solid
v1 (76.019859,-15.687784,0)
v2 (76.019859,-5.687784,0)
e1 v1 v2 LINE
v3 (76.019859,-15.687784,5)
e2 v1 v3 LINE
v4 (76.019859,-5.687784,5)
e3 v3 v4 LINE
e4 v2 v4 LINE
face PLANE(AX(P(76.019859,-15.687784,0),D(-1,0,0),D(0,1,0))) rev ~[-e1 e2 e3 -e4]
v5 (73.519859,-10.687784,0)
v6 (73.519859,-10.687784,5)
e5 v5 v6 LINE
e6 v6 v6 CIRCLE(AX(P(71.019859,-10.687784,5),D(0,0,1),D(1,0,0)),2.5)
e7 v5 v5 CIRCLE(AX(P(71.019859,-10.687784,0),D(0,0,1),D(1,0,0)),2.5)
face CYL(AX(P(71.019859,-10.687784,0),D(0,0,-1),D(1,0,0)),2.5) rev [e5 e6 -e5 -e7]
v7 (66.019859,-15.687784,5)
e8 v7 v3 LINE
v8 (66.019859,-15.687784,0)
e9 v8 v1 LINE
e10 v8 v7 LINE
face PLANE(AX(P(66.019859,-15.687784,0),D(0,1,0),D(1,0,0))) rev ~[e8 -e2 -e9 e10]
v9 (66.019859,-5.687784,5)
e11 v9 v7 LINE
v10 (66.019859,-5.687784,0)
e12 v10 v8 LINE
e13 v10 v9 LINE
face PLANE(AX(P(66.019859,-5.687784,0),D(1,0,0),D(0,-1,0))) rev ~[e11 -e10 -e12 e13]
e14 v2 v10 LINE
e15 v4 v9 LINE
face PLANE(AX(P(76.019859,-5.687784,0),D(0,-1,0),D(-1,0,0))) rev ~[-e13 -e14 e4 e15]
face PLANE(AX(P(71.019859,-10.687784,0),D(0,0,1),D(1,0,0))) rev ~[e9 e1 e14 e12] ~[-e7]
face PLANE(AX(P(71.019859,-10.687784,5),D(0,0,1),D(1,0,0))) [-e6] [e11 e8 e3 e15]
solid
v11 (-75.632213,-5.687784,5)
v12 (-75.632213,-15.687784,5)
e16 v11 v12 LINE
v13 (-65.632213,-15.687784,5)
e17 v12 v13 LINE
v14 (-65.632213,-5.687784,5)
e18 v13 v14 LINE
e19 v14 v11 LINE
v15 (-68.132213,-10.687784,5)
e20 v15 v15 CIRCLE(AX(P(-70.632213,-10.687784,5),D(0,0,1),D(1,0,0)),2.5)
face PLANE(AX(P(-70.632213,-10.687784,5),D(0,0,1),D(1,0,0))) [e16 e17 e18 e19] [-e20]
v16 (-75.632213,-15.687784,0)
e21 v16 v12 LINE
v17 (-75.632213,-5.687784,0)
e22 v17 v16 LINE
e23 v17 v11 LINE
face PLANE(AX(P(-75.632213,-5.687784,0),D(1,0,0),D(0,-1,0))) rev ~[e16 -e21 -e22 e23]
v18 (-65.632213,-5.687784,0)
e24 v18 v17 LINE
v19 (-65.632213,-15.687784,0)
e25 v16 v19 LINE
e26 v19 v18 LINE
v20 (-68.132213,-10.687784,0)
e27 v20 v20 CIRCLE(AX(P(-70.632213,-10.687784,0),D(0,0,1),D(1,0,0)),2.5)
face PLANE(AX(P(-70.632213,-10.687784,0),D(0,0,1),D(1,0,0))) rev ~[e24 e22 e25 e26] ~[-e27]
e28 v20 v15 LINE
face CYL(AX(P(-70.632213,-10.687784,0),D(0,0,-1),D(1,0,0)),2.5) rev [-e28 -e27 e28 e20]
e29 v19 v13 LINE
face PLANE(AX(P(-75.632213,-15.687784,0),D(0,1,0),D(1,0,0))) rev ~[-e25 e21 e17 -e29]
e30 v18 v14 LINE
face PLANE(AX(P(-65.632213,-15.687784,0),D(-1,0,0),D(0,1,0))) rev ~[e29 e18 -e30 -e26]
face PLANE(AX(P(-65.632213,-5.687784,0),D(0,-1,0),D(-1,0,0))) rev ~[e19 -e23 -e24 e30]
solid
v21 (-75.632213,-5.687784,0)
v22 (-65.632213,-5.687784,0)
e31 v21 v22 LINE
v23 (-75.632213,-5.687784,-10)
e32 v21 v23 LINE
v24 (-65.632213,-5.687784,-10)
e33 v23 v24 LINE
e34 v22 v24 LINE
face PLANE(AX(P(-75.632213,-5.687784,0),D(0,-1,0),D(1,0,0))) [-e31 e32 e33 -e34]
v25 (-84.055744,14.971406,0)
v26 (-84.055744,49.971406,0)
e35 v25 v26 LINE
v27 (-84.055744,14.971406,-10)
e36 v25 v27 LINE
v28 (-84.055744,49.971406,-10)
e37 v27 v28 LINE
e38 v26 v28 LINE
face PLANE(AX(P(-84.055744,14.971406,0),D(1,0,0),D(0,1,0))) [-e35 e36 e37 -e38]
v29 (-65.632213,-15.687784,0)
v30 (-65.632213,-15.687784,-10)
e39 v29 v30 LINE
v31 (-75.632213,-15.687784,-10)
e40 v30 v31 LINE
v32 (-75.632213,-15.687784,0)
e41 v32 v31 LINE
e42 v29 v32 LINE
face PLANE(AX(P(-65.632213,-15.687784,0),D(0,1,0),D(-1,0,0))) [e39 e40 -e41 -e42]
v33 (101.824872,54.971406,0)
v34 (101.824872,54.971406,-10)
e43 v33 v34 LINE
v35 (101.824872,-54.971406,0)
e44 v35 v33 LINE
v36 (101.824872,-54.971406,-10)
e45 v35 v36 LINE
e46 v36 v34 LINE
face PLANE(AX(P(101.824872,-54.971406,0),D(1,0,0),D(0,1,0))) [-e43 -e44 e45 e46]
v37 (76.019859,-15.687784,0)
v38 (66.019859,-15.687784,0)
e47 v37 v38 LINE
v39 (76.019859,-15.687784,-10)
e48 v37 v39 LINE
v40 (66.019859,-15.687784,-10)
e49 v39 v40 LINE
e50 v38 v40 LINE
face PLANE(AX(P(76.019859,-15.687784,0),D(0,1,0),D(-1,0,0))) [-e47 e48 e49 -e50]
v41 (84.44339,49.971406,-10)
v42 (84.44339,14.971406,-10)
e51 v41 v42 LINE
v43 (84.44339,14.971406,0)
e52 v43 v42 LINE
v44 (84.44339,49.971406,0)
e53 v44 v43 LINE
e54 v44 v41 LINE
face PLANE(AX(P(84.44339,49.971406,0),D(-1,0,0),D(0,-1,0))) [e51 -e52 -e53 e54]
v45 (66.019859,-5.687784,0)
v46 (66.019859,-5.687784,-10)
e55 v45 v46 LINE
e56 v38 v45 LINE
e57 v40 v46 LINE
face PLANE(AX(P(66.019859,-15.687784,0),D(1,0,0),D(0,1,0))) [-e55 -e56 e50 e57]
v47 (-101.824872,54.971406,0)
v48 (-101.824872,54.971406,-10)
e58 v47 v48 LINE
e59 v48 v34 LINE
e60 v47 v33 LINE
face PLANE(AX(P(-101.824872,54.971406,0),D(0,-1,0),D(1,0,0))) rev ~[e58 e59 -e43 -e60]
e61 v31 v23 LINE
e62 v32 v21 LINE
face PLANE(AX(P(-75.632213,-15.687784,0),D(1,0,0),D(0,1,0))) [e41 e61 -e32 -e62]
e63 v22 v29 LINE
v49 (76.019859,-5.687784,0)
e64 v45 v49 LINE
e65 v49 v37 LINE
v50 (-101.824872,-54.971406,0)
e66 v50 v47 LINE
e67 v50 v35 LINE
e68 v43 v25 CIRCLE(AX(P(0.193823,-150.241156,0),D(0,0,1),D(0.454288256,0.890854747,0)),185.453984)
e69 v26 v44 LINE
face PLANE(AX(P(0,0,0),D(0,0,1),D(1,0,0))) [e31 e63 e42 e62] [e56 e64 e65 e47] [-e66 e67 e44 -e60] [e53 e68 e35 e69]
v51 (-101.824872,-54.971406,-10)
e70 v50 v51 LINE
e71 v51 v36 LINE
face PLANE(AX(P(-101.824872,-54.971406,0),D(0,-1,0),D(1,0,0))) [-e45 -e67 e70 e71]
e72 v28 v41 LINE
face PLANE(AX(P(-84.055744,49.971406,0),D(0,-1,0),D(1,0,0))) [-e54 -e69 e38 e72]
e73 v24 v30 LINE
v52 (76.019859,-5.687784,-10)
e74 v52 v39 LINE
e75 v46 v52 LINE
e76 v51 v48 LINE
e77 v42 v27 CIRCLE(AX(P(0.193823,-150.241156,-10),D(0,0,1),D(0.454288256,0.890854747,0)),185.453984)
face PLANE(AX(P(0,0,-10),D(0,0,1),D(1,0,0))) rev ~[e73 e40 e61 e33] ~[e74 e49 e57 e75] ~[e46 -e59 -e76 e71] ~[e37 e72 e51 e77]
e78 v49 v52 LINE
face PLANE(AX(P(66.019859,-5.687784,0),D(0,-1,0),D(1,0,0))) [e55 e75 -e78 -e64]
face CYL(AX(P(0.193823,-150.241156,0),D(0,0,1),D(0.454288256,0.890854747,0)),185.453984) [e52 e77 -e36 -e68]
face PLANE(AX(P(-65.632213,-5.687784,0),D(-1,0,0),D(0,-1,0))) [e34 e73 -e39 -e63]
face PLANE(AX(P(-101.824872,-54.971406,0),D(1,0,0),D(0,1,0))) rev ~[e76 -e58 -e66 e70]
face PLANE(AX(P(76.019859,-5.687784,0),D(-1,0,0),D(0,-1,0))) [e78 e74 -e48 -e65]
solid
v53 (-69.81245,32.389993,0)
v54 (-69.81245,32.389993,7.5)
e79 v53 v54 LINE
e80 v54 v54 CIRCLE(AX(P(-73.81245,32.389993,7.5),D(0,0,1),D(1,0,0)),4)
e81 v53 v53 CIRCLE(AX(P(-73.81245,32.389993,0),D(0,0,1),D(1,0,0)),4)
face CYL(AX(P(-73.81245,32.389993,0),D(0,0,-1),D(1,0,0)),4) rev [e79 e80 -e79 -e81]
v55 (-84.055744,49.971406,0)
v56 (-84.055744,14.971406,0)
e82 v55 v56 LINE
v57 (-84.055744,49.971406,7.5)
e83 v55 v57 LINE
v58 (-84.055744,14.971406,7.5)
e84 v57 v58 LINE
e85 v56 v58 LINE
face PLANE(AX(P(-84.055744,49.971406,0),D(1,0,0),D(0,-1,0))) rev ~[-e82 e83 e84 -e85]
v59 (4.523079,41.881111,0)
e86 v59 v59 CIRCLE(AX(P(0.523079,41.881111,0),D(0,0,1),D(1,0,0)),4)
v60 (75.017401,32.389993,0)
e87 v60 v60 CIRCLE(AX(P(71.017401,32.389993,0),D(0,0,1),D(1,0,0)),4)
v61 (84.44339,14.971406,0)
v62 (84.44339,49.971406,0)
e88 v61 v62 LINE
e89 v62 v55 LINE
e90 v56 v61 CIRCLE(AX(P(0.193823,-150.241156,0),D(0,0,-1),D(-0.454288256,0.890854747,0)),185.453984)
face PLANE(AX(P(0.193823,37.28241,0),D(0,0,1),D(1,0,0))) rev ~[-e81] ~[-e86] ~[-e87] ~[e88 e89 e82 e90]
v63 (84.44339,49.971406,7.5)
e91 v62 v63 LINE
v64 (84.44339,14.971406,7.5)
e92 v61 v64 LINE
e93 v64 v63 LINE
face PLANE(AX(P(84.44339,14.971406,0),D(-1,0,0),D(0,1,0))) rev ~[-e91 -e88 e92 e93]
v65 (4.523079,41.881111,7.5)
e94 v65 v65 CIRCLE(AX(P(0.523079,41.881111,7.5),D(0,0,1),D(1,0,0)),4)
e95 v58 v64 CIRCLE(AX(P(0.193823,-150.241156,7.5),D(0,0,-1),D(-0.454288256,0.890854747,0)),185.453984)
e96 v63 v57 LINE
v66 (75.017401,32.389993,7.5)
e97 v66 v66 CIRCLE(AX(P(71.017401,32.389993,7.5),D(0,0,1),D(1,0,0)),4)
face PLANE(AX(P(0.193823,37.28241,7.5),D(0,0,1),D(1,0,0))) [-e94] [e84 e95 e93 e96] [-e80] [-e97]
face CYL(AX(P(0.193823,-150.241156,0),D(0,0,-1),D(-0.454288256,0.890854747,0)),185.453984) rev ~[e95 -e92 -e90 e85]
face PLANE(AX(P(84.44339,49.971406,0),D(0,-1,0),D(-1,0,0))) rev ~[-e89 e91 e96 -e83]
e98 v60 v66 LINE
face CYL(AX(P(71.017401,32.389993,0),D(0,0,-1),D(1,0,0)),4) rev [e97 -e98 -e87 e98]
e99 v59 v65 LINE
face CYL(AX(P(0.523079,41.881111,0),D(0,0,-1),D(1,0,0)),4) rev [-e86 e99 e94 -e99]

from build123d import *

# Parameters (mm, degrees)
F0_R     = 4
F1_DEPTH = 7.5
F0_R_2   = 2.5
F2_DEPTH = 5
F0_W     = 203.6497449993
F0_H     = 109.9428115989
F4_DEPTH = 10


# Not quite as in the source:
# - the program builds the solid bodies; features that only make, move or delete a surface that nothing else refers to are left out


with BuildPart() as f1:
    # F0 (on Top) → F1 (new body)
    with BuildSketch(Plane.XY):
        with BuildLine():
            Line((84.4433900163, 14.9714057995), (84.4433900163, 49.9714057995))
            Line((84.4433900163, 49.9714057995), (-84.0557436719, 49.9714057995))
            Line((-84.0557436719, 49.9714057995), (-84.0557436719, 14.9714057995))
            ThreePointArc((-84.0557436719, 14.9714057995), (0.1938231722, 35.2128277571), (84.4433900163, 14.9714057995))
        make_face()
        with Locations((-73.8124497916, 32.3899931005)):
            Circle(F0_R, mode=Mode.SUBTRACT)
        with Locations((0.5230791285, 41.8811105192)):
            Circle(F0_R, mode=Mode.SUBTRACT)
        with Locations((71.0174008963, 32.3899931005)):
            Circle(F0_R, mode=Mode.SUBTRACT)
    extrude(amount=F1_DEPTH)


with BuildPart() as f2:
    # F0 (on Top) → F2 (new body)
    with BuildSketch(Plane.XY):
        Polygon((-65.6322131381, -15.68778418), (-65.6322131381, -8.2608617701), (-65.6322131381, -5.68778418), (-75.6322131381, -5.68778418), (-75.6322131381, -15.68778418), align=None)
        with Locations((-70.6322131381, -10.68778418)):
            Circle(F0_R_2, mode=Mode.SUBTRACT)
    extrude(amount=F2_DEPTH)


with BuildPart() as f2b:
    # F0 (on Top) → F2, piece 2 (new body)
    with BuildSketch(Plane.XY):
        Polygon((66.0198594824, -5.68778418), (66.0198594824, -8.2608617701), (66.0198594824, -15.68778418), (76.0198594824, -15.68778418), (76.0198594824, -5.68778418), align=None)
        with Locations((71.0198594824, -10.68778418)):
            Circle(F0_R_2, mode=Mode.SUBTRACT)
    extrude(amount=F2_DEPTH)


with BuildPart() as f4:
    # F0 (on Top) → F4 (new body)
    with BuildSketch(Plane.XY):
        Rectangle(F0_W, F0_H)
        Polygon((-65.6322131381, -5.68778418), (-65.6322131381, -8.2608617701), (-65.6322131381, -15.68778418), (-75.6322131381, -15.68778418), (-75.6322131381, -5.68778418), align=None, mode=Mode.SUBTRACT)
        Polygon((66.0198594824, -15.68778418), (66.0198594824, -8.2608617701), (66.0198594824, -5.68778418), (76.0198594824, -5.68778418), (76.0198594824, -15.68778418), align=None, mode=Mode.SUBTRACT)
        with BuildLine():
            Line((-84.0557436719, 49.9714057995), (84.4433900163, 49.9714057995))
            Line((84.4433900163, 49.9714057995), (84.4433900163, 14.9714057995))
            ThreePointArc((84.4433900163, 14.9714057995), (0.1938231722, 35.2128277571), (-84.0557436719, 14.9714057995))
            Line((-84.0557436719, 14.9714057995), (-84.0557436719, 49.9714057995))
        make_face(mode=Mode.SUBTRACT)
    extrude(amount=-F4_DEPTH)


solid = Compound([f1.part, f2.part, f2b.part, f4.part])
